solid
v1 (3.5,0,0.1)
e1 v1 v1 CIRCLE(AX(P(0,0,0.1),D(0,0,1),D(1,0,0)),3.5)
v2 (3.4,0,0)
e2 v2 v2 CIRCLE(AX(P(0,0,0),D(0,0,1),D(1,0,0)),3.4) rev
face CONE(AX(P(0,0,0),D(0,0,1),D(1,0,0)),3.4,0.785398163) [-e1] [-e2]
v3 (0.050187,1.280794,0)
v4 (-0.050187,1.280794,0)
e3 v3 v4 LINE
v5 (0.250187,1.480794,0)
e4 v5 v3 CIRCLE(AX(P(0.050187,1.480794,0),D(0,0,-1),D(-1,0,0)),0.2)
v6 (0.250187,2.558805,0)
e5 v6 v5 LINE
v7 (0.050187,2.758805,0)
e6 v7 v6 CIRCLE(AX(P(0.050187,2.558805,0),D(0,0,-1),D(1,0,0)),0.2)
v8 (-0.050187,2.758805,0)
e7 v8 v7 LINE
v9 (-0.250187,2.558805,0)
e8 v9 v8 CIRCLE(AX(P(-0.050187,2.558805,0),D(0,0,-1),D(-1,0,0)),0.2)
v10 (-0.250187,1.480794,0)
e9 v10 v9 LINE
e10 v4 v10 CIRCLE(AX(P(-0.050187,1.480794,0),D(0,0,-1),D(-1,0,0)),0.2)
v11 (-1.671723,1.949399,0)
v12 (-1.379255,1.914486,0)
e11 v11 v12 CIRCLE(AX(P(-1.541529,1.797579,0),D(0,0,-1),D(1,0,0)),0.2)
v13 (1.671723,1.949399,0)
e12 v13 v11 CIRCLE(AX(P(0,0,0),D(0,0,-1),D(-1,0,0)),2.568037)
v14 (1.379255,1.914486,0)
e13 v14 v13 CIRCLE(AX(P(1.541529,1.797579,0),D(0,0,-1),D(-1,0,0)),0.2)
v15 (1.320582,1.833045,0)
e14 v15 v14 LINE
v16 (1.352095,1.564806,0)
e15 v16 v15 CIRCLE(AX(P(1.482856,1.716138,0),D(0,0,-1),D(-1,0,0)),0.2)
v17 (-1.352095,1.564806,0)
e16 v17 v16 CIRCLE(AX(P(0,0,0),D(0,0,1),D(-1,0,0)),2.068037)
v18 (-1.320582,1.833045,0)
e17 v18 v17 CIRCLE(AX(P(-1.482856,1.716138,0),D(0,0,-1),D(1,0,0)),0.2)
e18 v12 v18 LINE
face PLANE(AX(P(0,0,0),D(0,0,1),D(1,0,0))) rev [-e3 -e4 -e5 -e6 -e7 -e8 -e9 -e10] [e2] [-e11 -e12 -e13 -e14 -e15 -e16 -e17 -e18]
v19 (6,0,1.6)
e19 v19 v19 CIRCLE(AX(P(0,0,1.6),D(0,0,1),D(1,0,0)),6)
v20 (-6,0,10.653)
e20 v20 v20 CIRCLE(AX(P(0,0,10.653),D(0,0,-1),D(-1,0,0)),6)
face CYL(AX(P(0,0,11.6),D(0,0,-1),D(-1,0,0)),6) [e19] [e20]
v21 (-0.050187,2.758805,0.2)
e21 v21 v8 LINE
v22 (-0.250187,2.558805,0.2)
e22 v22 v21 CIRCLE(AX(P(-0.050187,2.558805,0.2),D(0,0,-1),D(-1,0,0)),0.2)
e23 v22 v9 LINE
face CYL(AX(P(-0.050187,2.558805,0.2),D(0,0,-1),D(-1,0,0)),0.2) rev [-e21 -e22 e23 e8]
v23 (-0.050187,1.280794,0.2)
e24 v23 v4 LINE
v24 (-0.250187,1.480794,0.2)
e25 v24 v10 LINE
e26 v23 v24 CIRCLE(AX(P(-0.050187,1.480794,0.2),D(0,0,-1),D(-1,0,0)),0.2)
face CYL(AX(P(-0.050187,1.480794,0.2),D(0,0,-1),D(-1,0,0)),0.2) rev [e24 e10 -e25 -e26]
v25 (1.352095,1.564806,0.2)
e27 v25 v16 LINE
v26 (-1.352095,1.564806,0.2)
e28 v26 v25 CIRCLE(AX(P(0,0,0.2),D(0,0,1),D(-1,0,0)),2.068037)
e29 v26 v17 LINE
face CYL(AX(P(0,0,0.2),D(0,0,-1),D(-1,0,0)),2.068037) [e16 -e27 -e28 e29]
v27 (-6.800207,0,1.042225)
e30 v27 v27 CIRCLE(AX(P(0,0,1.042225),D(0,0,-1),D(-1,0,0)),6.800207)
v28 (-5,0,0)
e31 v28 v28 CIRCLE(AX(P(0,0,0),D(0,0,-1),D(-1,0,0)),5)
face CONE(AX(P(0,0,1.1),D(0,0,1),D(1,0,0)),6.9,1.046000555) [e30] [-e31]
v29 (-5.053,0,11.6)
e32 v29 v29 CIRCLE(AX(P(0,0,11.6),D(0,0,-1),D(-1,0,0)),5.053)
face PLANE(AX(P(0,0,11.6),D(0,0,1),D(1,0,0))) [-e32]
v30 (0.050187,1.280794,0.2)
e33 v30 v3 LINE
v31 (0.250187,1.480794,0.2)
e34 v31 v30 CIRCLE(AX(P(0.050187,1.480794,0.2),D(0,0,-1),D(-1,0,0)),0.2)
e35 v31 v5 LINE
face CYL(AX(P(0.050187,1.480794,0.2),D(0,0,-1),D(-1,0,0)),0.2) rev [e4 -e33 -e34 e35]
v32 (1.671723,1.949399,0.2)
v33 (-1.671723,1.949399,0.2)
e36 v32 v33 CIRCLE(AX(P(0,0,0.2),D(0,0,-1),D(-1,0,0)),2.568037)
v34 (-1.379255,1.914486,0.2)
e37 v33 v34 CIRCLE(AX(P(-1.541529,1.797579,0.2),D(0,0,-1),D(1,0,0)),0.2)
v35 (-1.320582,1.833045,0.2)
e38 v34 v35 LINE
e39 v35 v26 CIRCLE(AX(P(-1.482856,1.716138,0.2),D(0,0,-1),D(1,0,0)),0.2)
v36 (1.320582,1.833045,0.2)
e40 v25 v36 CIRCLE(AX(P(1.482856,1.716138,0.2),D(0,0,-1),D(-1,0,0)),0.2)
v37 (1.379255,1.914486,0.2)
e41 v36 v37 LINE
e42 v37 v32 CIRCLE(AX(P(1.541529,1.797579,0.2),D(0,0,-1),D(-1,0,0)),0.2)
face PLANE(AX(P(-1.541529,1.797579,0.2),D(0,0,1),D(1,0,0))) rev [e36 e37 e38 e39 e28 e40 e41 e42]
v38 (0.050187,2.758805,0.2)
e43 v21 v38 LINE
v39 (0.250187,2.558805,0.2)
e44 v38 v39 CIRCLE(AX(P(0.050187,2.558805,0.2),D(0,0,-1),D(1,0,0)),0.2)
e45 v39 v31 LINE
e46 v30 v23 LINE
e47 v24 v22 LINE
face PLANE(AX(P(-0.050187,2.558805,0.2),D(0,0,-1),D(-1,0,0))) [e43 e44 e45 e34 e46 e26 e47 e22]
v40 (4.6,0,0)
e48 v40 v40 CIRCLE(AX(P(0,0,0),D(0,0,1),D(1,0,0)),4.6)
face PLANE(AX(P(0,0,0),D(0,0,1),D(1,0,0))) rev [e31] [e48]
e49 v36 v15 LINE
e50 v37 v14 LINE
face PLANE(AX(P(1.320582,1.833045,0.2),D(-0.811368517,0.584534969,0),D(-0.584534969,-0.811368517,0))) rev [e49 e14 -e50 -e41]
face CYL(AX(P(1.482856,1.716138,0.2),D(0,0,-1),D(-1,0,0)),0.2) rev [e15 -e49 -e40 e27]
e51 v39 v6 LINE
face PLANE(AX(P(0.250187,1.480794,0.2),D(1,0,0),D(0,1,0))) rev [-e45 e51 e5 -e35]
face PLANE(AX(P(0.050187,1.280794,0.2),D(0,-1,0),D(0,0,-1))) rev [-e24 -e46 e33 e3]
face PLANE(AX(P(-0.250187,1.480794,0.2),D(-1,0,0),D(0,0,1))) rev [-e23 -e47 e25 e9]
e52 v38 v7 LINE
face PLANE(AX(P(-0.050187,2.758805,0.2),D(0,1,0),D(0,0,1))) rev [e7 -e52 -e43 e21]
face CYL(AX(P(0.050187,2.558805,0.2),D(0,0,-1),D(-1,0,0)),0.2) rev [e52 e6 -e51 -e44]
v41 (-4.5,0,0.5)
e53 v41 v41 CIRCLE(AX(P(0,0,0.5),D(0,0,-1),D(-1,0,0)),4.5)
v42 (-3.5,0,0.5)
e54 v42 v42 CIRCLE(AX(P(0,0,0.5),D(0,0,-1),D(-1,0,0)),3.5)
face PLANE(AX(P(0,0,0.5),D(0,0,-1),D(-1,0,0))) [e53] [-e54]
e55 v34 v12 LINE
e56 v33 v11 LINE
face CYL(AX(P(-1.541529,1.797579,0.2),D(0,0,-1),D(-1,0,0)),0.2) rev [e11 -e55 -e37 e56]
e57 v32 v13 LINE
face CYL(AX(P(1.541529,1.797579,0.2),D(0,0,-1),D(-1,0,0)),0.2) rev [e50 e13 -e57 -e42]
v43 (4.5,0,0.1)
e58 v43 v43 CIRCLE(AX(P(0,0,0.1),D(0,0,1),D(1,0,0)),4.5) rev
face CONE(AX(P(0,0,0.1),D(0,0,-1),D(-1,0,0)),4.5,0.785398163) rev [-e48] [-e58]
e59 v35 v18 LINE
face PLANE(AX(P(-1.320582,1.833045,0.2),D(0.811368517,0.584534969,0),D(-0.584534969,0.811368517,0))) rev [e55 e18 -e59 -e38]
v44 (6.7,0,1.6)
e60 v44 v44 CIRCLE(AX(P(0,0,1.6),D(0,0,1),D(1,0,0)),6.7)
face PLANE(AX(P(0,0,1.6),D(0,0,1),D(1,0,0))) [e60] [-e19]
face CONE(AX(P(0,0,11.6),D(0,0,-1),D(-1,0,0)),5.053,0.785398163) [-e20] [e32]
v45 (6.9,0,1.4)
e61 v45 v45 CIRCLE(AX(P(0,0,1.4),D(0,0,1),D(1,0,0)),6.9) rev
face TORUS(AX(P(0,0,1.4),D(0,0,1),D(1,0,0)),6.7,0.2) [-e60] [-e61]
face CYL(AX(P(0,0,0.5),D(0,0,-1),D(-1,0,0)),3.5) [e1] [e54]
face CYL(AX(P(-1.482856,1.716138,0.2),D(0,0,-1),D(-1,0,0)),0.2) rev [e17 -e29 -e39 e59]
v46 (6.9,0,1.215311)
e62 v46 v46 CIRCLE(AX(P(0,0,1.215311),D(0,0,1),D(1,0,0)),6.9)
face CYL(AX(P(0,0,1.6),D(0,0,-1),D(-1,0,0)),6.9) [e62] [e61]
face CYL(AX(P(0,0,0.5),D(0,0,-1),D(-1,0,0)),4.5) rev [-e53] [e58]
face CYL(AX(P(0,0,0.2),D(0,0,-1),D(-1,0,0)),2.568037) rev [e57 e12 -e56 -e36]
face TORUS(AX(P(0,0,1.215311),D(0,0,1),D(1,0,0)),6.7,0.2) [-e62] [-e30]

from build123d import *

# Parameters (mm, degrees)
SKETCH_2_R          = 6.9
EXTRUDE_1_DEPTH     = 1.6
SKETCH_4_R          = 6
EXTRUDE_2_DEPTH     = 10
SKETCH_7_R          = 4.5
SKETCH_7_R_2        = 3.5
CUT_EXTRUDE_1_DEPTH = 0.5
CUT_EXTRUDE_2_DEPTH = 0.2
CHAMFER_1_SIZE      = 0.1
FILLET_1_R          = 0.2


# Read off the part's stored shape, not the designer's step: M12 机械螺纹 螺柱1
with BuildPart() as part:
    # 草图2 → 凸台-拉伸1 (new body)
    with BuildSketch(Plane.XY):
        Circle(SKETCH_2_R)
    extrude(amount=EXTRUDE_1_DEPTH)

    # 草图3 → 切除-旋转1 (revolve, cut)
    with BuildSketch(Plane(origin=(0, 0, 0), x_dir=(1, 0, 0), z_dir=(0, 1, 0))):
        Polygon((-6.9, -1.1), (-5, 0), (-6.9, 0), align=None)
    revolve(axis=Axis((0, 0, -2.565533084), (0, 0, 1)), mode=Mode.SUBTRACT)

    # 草图4 → 凸台-拉伸2 (add)
    with BuildSketch(Plane.XY.offset(1.6)):
        Circle(SKETCH_4_R)
    extrude(amount=EXTRUDE_2_DEPTH)

    # M12 机械螺纹 螺柱1 outline → M12 机械螺纹 螺柱1 (revolve, cut)
    with BuildSketch(Plane.XZ):
        Polygon((6, 11.6), (5.053, 11.6), (6, 10.653), align=None)
    revolve(axis=Axis((0, 0, 0), (0, 0, 1)), mode=Mode.SUBTRACT)

    # 草图7 → 切除-拉伸1 (cut)
    with BuildSketch(Plane(origin=(0, 0, 0), x_dir=(-1, 0, 0), z_dir=(0, 0, -1))):
        Circle(SKETCH_7_R)
        Circle(SKETCH_7_R_2, mode=Mode.SUBTRACT)
    extrude(amount=-CUT_EXTRUDE_1_DEPTH, mode=Mode.SUBTRACT)

    # 草图8 → 切除-拉伸2 (cut)
    with BuildSketch(Plane(origin=(0, 0, 0), x_dir=(-1, 0, 0), z_dir=(0, 0, -1))):
        with BuildLine():
            Line((1.320582444, 1.833045199), (1.379254836, 1.91448589))
            ThreePointArc((1.379254836, 1.91448589), (1.517822019, 1.996168929), (1.671723162, 1.949399054))
            ThreePointArc((1.671723162, 1.949399054), (0, -2.568037189), (-1.671723162, 1.949399054))
            ThreePointArc((-1.671723162, 1.949399054), (-1.517822019, 1.996168929), (-1.379254836, 1.91448589))
            Line((-1.379254836, 1.91448589), (-1.320582444, 1.833045199))
            ThreePointArc((-1.320582444, 1.833045199), (-1.284222156, 1.69280287), (-1.352094962, 1.564805747))
            ThreePointArc((-1.352094962, 1.564805747), (0, -2.068037189), (1.352094962, 1.564805747))
            ThreePointArc((1.352094962, 1.564805747), (1.284222156, 1.69280287), (1.320582444, 1.833045199))
        make_face()
        with BuildLine():
            Line((-0.050187239, 1.280793561), (0.050187239, 1.280793561))
            ThreePointArc((0.050187239, 1.280793561), (0.191608596, 1.339372204), (0.250187239, 1.480793561))
            Line((0.250187239, 1.480793561), (0.250187239, 2.558804723))
            ThreePointArc((0.250187239, 2.558804723), (0.191608596, 2.70022608), (0.050187239, 2.758804723))
            Line((0.050187239, 2.758804723), (-0.050187239, 2.758804723))
            ThreePointArc((-0.050187239, 2.758804723), (-0.191608596, 2.70022608), (-0.250187239, 2.558804723))
            Line((-0.250187239, 2.558804723), (-0.250187239, 1.480793561))
            ThreePointArc((-0.250187239, 1.480793561), (-0.191608596, 1.339372204), (-0.050187239, 1.280793561))
        make_face()
    extrude(amount=-CUT_EXTRUDE_2_DEPTH, mode=Mode.SUBTRACT)

    # 倒角1
    chamfer_1_edges = [part.edges().sort_by_distance(p)[0] for p in [
        (4.5, 0, 0),
        (3.5, 0, 0),
    ]]
    chamfer(chamfer_1_edges, length=CHAMFER_1_SIZE)

    # 圆角1
    fillet_1_edges = [part.edges().sort_by_distance(p)[0] for p in [
        (-6.9, 0, 1.6),
        (0, 6.9, 1.1),
    ]]
    fillet(fillet_1_edges, radius=FILLET_1_R)


solid = part.part
